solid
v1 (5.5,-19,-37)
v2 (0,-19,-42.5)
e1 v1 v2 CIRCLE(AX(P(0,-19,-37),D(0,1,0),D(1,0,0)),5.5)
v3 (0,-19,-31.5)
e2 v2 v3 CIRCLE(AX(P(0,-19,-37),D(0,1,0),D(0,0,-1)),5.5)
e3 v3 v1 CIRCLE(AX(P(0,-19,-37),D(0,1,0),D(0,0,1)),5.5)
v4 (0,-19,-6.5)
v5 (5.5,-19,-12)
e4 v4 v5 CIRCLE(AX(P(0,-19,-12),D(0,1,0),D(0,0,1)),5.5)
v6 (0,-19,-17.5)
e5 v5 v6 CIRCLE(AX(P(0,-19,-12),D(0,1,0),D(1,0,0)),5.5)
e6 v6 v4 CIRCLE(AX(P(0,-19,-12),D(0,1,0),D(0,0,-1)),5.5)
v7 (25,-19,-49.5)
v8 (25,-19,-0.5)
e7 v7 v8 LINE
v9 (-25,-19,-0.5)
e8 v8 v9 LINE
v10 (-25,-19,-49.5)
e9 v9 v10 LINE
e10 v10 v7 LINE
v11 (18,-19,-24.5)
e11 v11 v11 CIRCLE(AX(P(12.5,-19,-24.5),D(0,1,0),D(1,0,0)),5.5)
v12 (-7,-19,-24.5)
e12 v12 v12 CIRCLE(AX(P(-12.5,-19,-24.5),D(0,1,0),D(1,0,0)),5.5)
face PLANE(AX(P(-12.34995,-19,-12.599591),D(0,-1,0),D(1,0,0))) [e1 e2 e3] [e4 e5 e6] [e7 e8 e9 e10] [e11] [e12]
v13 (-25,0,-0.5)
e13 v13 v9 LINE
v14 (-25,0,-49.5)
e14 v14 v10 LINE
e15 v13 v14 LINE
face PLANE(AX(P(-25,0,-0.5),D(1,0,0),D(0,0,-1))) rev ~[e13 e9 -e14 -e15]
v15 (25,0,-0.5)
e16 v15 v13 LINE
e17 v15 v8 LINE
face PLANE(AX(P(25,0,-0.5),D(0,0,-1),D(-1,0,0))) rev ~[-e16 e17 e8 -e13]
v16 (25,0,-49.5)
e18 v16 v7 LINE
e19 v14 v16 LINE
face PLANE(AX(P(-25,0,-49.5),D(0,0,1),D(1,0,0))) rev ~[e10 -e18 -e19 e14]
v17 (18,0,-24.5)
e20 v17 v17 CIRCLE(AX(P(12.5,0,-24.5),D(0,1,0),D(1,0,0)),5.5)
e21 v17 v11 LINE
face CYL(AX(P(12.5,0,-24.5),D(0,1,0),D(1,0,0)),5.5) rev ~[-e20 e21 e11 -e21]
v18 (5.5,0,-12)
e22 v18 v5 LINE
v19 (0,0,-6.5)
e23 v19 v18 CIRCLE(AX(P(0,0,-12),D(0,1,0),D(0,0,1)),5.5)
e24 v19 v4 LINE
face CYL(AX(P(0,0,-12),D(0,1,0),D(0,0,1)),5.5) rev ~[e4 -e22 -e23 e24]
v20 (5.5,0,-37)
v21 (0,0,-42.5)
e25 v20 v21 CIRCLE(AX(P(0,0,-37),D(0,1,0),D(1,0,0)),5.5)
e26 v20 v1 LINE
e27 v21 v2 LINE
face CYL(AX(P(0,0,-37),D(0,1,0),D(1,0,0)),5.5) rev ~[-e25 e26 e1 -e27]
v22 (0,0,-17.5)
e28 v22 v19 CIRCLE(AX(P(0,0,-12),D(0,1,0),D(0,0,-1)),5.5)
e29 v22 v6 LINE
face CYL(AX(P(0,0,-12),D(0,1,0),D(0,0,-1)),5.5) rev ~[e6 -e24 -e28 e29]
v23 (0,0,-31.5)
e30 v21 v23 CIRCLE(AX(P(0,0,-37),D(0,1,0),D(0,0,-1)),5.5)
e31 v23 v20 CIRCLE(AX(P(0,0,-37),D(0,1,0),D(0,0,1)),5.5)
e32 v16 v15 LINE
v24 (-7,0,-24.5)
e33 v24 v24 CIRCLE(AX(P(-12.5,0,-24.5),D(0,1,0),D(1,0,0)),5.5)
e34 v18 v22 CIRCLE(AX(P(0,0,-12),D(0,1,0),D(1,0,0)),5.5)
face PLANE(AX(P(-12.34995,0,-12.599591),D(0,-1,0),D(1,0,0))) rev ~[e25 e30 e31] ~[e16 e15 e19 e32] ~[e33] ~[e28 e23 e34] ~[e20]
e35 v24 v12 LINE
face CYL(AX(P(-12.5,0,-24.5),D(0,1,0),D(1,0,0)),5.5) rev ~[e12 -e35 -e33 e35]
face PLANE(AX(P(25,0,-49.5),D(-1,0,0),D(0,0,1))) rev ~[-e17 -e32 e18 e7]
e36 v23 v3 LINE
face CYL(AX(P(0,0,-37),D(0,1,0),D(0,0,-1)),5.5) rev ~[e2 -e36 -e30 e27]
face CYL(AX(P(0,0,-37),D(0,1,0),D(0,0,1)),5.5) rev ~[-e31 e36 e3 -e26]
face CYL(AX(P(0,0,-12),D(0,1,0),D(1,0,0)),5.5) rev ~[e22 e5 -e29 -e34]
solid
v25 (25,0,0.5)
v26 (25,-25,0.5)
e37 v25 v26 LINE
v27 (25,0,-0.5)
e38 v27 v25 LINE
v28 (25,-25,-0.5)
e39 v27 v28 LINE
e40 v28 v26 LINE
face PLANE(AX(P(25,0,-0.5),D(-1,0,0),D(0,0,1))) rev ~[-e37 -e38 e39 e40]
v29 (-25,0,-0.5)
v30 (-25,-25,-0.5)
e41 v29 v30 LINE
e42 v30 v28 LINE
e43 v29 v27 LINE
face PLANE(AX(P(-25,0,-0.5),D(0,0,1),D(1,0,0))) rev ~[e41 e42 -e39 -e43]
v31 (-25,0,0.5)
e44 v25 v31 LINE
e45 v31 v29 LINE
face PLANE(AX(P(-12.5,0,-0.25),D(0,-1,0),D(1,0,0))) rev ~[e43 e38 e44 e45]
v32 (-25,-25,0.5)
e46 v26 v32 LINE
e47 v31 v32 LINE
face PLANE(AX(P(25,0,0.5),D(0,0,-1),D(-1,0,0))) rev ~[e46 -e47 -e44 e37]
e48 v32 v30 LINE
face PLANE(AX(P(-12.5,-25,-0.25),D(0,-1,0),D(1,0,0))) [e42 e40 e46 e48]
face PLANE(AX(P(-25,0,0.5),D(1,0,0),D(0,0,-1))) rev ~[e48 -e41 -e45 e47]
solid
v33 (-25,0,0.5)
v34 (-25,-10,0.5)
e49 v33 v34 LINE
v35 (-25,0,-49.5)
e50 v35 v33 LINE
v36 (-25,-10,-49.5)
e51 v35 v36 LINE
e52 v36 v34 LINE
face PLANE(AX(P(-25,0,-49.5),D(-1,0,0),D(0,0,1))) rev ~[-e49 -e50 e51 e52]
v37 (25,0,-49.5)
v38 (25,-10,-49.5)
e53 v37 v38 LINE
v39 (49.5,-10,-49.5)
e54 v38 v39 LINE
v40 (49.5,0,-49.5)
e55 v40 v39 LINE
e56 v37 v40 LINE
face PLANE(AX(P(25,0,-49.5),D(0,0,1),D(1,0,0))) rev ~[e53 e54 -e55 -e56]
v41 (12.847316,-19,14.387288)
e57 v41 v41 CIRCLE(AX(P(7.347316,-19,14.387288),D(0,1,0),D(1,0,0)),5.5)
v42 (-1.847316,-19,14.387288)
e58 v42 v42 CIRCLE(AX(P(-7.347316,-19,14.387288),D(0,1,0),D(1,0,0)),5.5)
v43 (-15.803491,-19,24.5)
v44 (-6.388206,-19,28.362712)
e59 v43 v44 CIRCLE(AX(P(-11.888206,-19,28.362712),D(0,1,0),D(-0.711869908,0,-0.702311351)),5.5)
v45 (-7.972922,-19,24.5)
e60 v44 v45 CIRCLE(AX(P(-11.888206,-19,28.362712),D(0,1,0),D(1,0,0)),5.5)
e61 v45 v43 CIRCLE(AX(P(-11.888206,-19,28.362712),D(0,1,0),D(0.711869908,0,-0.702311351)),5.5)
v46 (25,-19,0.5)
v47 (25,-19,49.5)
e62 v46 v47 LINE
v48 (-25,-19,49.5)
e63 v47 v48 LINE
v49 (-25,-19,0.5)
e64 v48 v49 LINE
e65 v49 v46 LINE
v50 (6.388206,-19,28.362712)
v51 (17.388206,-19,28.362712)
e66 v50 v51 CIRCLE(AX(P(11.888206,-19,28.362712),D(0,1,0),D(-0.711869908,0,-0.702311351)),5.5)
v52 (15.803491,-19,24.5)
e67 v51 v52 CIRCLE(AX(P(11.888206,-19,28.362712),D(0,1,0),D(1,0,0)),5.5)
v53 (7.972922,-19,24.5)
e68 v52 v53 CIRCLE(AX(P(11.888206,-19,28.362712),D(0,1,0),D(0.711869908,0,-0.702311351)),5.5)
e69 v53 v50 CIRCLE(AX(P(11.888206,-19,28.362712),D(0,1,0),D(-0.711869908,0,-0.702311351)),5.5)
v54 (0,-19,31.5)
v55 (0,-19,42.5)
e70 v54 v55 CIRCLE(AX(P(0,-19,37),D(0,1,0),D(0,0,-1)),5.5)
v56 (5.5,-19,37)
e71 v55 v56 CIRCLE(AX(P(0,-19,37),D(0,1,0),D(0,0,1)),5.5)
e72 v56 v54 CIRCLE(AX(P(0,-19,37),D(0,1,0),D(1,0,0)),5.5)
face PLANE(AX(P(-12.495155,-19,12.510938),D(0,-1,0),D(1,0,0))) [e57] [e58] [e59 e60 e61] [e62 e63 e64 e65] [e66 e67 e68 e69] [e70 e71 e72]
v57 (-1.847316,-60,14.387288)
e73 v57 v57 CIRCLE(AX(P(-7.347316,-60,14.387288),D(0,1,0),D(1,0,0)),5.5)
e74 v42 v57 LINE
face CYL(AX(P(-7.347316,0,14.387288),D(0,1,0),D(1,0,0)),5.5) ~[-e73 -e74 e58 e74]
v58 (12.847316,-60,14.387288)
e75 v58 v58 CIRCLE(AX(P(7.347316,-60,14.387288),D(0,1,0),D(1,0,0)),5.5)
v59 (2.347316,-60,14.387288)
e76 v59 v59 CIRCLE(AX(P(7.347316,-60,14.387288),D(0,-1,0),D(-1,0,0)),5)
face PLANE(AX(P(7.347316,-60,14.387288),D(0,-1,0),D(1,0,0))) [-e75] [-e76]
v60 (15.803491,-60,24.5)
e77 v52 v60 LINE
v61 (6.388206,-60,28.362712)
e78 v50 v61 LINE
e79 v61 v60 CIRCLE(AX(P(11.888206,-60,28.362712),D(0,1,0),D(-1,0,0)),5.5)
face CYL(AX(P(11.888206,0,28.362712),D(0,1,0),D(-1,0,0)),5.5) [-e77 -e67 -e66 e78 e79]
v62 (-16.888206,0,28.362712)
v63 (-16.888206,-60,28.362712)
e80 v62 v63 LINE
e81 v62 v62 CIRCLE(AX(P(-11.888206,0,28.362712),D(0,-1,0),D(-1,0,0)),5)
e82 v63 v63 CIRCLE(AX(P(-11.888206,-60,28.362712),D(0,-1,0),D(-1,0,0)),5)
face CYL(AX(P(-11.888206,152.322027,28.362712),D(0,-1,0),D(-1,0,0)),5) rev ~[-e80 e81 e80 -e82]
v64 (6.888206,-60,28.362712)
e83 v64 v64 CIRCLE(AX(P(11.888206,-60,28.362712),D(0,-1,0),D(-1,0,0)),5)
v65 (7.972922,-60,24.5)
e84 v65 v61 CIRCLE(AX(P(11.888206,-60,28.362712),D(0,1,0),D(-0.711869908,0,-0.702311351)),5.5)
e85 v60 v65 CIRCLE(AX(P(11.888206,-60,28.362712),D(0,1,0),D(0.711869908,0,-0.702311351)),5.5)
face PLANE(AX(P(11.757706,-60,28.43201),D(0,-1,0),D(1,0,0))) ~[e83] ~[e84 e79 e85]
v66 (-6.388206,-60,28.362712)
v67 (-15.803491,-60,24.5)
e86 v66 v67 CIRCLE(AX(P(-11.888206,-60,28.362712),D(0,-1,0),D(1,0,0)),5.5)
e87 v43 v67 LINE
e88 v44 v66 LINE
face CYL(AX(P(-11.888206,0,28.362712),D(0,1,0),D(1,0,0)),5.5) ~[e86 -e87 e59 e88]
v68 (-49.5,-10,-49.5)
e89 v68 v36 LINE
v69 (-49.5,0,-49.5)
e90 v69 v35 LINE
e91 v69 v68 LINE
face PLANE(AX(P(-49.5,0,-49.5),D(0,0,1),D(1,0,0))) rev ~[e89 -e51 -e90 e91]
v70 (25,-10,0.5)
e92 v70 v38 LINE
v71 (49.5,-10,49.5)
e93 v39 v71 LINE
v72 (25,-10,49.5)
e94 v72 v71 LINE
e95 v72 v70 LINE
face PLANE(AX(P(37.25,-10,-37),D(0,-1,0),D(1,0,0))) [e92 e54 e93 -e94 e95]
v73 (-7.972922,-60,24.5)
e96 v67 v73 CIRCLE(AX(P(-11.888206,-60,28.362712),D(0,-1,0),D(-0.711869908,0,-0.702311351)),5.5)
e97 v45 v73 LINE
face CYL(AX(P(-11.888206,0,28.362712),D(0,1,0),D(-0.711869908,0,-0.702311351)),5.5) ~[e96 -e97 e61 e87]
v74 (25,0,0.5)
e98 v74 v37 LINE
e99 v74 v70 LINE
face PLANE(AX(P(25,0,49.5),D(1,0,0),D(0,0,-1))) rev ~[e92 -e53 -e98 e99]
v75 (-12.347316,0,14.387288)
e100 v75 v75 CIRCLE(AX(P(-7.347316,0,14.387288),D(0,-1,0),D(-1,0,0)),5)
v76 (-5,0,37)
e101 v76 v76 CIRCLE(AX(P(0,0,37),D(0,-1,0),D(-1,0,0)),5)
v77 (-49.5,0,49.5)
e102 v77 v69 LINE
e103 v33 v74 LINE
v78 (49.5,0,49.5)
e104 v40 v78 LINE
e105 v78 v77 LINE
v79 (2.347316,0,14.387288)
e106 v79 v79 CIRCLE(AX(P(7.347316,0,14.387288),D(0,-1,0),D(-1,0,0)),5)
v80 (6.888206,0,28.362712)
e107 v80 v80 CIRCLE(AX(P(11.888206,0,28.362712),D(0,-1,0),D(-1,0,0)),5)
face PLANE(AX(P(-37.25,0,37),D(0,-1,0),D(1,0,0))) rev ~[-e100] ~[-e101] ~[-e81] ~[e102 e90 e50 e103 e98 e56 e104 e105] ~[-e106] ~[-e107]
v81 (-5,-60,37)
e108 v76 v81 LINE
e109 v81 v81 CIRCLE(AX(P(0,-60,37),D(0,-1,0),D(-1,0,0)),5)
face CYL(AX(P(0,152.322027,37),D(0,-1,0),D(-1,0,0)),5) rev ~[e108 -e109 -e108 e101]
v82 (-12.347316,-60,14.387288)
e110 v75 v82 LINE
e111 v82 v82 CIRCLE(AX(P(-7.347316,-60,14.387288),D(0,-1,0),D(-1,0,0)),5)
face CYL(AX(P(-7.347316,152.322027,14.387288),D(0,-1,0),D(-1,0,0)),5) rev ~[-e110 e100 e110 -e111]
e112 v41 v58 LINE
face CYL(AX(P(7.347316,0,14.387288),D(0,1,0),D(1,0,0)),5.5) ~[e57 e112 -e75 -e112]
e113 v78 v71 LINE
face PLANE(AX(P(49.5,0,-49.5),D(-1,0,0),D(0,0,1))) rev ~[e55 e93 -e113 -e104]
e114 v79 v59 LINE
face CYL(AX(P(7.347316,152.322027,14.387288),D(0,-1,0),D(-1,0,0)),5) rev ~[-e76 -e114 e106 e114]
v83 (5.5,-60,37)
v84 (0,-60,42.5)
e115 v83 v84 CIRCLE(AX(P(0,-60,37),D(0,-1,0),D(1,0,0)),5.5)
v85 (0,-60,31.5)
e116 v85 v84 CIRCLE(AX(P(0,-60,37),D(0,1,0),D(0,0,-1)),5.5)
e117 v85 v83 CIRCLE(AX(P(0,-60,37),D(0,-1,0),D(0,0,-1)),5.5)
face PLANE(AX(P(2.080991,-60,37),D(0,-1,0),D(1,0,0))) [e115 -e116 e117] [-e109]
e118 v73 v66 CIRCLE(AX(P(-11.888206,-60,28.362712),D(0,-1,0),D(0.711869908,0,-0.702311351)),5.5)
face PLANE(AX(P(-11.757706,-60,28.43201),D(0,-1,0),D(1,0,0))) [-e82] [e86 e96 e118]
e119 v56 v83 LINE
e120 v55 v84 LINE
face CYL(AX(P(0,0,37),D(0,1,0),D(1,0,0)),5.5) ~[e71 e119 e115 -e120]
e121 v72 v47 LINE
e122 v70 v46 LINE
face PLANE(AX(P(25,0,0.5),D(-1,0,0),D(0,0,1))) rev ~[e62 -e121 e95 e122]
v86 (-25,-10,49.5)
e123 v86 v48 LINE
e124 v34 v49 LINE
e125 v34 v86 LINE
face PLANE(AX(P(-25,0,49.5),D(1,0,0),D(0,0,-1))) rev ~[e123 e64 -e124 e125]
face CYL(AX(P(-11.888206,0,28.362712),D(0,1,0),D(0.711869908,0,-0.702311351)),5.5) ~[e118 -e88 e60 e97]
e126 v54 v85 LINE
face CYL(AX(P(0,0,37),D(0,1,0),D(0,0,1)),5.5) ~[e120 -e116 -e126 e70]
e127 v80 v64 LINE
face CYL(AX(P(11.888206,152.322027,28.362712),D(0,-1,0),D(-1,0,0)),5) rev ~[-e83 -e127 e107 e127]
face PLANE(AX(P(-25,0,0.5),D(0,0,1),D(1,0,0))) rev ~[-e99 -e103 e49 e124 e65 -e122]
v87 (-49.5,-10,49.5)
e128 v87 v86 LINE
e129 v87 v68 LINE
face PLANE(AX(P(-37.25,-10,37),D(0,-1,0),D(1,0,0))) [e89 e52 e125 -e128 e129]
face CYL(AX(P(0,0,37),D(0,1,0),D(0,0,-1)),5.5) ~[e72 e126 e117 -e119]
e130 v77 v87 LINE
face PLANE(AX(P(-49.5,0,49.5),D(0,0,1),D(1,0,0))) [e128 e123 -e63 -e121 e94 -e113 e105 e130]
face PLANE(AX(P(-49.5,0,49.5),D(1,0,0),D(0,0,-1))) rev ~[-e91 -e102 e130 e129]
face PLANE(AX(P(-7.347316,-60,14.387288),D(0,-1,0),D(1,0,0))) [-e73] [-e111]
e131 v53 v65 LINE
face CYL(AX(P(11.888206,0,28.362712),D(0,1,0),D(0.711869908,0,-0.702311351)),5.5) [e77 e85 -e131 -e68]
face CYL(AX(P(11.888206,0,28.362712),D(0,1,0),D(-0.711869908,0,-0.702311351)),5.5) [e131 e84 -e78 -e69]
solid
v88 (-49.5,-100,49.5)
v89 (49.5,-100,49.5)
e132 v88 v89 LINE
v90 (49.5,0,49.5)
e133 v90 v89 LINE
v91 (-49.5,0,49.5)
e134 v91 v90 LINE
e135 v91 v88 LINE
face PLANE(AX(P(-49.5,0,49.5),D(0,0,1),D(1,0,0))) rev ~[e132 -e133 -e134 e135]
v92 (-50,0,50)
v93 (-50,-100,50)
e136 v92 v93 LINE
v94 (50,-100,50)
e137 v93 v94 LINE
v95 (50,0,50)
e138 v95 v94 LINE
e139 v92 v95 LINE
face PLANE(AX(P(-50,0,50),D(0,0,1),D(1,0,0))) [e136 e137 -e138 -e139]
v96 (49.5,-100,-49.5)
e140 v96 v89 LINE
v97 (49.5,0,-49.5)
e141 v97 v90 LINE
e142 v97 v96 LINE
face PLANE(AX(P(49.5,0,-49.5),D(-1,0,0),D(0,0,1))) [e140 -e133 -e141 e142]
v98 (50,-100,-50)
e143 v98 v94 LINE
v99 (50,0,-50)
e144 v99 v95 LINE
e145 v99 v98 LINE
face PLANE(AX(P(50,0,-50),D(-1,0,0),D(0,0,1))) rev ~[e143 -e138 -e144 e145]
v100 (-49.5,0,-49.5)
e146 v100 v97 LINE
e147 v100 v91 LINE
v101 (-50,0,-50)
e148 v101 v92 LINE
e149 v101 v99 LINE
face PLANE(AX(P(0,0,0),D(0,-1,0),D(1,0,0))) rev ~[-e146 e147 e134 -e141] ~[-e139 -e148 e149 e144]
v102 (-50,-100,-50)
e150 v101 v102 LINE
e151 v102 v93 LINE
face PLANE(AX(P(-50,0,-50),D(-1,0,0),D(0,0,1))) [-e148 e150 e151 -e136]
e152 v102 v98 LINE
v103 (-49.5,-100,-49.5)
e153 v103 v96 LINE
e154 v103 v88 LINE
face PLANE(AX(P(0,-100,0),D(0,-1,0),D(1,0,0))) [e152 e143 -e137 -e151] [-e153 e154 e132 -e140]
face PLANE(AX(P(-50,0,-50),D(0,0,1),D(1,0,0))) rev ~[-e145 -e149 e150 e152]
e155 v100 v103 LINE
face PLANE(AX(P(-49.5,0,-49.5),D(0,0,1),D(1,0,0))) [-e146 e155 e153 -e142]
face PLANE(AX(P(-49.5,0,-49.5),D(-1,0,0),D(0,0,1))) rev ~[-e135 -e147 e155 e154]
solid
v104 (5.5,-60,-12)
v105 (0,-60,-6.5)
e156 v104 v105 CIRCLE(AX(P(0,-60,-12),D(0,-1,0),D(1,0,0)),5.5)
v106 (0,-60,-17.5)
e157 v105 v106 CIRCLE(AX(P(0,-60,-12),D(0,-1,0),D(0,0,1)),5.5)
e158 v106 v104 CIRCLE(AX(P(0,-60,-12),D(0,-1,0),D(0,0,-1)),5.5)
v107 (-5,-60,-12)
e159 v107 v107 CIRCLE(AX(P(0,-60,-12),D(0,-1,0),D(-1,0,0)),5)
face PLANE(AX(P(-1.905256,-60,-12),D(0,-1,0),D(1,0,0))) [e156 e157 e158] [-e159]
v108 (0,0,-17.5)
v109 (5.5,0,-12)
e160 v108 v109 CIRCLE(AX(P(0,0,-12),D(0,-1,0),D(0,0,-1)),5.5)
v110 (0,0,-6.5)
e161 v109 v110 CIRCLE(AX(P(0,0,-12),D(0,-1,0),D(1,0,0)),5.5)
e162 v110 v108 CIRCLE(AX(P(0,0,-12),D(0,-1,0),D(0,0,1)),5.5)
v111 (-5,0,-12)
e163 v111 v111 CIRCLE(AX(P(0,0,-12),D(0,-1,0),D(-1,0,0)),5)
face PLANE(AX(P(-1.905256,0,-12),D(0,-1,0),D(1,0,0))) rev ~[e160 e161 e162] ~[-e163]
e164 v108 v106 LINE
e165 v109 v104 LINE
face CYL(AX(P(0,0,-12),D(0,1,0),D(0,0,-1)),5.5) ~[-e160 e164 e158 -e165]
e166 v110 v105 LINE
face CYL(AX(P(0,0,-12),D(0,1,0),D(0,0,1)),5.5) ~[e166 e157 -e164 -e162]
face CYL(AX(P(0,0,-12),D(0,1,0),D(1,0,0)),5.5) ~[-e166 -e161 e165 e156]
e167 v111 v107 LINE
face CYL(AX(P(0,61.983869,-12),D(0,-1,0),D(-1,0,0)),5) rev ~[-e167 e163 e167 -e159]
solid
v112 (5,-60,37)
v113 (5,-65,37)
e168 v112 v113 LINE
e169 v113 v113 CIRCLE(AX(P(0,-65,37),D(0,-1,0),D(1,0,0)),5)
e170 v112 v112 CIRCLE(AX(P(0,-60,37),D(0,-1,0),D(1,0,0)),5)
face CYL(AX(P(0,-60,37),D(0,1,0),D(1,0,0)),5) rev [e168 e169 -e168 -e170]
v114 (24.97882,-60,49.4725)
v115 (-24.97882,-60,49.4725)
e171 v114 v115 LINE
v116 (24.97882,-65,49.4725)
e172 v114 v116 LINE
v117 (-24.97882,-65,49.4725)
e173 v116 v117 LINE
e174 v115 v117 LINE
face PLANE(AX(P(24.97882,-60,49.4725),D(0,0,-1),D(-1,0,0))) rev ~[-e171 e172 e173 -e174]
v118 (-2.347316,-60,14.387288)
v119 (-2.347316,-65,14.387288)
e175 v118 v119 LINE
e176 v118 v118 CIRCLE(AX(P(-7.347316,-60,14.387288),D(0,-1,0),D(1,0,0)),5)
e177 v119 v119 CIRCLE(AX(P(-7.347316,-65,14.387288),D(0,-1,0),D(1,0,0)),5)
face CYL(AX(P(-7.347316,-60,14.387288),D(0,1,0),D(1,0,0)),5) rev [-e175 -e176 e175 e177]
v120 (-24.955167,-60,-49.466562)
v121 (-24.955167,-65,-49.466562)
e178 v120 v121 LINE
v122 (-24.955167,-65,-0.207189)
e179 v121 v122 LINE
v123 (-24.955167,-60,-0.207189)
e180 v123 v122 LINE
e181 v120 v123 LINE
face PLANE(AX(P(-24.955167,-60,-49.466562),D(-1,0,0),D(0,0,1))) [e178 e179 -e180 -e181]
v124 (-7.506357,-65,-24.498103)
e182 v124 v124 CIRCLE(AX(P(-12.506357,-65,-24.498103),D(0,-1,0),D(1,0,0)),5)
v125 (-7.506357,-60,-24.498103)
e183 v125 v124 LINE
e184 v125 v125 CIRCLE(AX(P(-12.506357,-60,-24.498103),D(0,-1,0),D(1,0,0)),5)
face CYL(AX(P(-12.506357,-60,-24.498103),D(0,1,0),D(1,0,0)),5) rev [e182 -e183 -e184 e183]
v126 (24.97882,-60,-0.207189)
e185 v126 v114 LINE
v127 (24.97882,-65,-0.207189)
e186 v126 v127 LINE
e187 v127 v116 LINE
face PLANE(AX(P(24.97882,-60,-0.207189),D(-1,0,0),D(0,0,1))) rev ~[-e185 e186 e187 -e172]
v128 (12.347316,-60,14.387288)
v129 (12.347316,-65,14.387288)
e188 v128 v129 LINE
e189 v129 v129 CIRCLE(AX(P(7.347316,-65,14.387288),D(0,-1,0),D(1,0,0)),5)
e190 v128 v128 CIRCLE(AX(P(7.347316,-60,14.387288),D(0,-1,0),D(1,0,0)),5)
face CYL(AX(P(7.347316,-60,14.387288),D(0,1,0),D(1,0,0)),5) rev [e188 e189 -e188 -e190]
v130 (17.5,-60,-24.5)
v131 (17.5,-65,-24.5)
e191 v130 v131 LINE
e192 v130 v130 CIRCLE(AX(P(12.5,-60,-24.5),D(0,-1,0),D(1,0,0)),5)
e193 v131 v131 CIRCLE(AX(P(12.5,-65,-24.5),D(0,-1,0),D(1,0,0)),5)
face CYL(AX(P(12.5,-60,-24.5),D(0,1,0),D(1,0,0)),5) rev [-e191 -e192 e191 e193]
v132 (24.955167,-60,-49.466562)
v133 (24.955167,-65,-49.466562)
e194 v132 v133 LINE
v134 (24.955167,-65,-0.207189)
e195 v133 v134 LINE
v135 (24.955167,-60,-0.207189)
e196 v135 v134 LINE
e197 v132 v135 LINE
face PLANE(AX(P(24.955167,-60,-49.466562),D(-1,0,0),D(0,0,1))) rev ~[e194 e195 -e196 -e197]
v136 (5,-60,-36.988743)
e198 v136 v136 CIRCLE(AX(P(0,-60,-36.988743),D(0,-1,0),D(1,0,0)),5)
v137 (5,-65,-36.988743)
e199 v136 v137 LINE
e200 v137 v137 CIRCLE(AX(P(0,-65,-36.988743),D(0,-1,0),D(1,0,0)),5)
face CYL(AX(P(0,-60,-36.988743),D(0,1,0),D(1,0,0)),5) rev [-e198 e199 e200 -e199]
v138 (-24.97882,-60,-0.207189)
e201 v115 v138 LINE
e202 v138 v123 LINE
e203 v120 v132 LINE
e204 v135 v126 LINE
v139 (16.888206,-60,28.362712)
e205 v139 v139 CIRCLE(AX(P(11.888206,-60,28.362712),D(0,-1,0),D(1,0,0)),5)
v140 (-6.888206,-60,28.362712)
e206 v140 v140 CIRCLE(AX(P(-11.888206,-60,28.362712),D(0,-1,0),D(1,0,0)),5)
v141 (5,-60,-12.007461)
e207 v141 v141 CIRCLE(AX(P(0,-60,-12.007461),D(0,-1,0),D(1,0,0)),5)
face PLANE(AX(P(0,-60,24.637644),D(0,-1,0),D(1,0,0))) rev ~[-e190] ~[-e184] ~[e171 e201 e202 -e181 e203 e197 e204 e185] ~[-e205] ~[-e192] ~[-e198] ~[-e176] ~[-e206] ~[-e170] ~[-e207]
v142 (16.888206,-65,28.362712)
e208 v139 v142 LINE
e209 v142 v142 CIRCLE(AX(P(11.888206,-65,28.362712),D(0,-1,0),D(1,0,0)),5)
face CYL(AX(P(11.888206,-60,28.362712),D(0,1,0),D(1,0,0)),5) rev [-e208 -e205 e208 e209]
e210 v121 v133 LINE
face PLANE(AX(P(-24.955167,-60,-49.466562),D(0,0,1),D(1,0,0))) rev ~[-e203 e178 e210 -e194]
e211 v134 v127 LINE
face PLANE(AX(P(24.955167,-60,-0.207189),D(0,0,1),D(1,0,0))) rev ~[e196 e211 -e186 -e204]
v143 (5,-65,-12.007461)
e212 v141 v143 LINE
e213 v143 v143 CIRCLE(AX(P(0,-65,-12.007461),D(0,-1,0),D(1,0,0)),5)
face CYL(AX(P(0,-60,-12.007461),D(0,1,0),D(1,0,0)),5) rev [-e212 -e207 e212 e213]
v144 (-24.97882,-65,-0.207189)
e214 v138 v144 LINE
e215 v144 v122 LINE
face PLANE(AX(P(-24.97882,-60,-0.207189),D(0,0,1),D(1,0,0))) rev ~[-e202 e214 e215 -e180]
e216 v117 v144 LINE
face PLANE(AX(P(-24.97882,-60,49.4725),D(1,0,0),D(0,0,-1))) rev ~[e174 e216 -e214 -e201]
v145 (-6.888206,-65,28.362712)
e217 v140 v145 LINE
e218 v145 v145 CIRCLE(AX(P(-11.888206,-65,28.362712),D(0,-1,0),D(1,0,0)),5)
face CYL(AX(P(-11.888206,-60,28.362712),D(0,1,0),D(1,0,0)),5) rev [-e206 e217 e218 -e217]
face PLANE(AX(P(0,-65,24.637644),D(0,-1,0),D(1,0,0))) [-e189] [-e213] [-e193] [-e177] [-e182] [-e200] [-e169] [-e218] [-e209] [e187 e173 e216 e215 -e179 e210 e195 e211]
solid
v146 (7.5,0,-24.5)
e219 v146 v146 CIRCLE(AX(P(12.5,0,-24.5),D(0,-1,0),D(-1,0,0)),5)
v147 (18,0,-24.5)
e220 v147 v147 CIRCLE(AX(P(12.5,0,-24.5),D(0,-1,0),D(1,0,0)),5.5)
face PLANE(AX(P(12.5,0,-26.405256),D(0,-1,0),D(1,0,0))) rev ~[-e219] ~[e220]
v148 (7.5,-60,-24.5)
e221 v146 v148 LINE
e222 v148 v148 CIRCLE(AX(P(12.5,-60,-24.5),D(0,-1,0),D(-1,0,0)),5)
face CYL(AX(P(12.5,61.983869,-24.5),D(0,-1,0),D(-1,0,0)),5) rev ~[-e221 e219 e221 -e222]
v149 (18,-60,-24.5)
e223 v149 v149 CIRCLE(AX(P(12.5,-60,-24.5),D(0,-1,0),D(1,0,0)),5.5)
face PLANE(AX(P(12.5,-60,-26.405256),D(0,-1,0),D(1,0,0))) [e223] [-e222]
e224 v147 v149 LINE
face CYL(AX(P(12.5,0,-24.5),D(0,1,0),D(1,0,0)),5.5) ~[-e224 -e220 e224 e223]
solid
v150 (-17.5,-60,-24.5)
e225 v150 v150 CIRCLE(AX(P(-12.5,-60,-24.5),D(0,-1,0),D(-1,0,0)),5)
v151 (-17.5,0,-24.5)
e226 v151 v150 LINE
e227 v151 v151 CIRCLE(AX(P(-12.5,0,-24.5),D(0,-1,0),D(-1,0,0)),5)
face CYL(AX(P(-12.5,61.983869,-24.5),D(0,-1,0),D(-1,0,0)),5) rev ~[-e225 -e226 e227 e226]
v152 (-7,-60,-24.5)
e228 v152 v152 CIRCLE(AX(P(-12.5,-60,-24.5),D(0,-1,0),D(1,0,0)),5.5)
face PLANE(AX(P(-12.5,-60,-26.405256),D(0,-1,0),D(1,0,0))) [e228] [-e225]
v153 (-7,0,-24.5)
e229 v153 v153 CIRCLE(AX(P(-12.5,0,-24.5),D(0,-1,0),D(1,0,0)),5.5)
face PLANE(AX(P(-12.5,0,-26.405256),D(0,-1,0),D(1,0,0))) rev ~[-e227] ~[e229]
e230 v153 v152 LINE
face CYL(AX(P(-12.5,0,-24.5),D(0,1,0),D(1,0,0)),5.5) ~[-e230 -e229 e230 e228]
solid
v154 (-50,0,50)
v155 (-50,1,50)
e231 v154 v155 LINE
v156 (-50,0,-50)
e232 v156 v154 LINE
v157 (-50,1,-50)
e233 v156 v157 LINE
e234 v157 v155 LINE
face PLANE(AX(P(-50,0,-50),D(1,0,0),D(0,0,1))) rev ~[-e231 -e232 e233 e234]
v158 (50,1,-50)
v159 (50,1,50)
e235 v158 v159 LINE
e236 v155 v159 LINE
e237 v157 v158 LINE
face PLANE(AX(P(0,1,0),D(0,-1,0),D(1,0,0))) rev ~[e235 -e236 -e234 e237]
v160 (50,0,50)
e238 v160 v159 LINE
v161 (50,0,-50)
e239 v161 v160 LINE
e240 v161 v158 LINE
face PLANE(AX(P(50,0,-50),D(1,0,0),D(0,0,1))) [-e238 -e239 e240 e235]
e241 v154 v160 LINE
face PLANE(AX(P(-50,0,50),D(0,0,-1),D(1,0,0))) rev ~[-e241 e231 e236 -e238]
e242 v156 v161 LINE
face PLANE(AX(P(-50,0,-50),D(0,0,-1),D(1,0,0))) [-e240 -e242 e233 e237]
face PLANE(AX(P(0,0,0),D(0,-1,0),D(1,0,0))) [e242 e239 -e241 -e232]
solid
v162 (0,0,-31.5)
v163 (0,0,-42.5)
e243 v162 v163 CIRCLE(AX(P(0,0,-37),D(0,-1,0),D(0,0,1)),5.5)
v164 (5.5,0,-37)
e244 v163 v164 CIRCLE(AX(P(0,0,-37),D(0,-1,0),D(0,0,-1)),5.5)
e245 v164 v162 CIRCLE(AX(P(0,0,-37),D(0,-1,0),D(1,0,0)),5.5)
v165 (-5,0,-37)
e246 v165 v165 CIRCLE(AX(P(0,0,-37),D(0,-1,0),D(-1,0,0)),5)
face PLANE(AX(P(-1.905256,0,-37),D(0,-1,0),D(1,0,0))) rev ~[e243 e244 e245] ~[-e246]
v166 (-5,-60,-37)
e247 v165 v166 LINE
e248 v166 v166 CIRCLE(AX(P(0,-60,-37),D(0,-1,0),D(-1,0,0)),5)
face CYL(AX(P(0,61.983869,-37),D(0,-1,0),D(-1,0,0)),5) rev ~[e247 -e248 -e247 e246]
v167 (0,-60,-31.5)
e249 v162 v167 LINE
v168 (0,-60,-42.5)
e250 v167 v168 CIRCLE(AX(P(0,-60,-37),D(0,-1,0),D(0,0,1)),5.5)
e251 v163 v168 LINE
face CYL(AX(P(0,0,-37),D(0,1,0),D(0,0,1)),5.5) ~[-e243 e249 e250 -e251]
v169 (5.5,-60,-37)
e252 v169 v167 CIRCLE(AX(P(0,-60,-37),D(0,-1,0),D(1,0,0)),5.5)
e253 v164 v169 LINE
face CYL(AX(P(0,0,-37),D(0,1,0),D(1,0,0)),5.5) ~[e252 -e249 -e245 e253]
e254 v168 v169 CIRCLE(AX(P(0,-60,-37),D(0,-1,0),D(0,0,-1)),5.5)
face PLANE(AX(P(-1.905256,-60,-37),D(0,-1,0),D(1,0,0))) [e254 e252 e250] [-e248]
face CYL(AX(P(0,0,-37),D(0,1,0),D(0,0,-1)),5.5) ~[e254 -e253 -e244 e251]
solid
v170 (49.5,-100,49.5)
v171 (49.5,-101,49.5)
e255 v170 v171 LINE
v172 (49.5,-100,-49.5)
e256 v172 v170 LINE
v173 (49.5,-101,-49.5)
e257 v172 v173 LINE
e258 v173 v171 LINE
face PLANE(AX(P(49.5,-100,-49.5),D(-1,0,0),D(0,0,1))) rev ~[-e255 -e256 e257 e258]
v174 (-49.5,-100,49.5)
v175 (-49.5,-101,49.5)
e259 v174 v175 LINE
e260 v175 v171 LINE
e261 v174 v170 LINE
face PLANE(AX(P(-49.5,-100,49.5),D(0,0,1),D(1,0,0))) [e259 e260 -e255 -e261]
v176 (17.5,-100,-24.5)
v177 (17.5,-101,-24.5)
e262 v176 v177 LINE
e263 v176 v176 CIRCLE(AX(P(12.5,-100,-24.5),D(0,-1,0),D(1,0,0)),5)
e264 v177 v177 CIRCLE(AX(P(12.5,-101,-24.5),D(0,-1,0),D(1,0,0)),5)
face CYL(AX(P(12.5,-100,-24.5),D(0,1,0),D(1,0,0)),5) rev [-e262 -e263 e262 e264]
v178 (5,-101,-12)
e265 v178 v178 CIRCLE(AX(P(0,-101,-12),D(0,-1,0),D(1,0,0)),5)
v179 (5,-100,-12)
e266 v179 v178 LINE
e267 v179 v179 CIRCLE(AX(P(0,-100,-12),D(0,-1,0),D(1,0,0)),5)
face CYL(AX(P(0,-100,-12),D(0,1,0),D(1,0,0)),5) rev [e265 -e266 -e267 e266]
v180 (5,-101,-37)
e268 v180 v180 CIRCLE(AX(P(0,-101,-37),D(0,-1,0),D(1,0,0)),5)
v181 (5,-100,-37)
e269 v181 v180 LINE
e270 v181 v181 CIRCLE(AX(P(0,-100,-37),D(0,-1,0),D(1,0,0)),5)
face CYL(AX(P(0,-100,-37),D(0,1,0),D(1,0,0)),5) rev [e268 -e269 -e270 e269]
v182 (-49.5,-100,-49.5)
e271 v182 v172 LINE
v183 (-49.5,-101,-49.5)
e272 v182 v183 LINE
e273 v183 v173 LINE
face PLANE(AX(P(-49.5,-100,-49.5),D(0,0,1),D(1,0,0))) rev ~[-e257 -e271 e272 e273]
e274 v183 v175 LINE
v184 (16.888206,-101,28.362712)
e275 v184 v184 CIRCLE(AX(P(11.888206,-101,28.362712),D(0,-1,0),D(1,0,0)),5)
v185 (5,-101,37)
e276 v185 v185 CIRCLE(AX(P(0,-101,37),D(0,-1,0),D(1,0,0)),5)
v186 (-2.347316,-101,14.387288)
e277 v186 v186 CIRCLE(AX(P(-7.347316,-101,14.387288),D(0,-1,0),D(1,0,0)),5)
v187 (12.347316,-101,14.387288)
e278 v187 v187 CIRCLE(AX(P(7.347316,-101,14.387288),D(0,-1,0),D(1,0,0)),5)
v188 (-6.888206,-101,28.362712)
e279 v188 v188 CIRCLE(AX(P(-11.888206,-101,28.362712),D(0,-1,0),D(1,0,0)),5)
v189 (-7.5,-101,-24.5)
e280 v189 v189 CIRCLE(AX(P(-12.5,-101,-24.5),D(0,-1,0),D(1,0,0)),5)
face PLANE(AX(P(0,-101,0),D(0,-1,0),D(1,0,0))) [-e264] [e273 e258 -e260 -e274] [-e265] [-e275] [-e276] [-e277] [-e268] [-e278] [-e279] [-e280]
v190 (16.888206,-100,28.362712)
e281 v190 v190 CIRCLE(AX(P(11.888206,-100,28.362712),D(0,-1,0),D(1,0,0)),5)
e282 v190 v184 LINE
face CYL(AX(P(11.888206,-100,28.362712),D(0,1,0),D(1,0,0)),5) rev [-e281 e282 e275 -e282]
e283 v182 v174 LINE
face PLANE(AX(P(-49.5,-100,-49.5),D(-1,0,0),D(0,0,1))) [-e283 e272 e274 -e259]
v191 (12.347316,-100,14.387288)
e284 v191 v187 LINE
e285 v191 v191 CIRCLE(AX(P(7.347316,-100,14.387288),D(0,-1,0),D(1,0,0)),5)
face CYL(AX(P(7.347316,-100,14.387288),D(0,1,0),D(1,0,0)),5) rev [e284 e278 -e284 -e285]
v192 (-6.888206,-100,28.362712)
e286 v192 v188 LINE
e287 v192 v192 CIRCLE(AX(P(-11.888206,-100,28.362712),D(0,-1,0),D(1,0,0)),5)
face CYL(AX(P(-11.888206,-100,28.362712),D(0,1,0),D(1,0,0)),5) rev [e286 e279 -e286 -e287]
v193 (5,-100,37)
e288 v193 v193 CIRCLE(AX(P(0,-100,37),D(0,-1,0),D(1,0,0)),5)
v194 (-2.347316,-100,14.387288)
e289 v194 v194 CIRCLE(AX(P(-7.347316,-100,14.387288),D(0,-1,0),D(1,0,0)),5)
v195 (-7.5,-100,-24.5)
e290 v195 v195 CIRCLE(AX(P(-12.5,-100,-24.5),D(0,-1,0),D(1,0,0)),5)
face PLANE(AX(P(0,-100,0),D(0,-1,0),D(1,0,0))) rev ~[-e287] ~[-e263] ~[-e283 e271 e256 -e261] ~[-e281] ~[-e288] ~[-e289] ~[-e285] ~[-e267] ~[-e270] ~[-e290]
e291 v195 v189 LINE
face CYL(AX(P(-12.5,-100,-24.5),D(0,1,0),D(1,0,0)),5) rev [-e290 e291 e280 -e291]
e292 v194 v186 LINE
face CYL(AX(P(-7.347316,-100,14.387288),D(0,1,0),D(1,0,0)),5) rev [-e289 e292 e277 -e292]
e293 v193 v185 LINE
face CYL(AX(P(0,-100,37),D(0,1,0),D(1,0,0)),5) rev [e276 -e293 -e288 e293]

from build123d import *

# Parameters (mm, degrees)
F0_R      = 5.5
F1_DEPTH  = 19
F0_W      = 24.5
F0_H      = 25
F2_DEPTH  = 10
F3_DEPTH  = 60
F0_W_2    = 25
F0_H_2    = 0.5
F4_DEPTH  = 25
F5_D      = 10
F5_2_D    = 10
F5_3_D    = 10
F5_4_D    = 10
F5_5_D    = 10
F6_W      = 100
F6_H      = 100
F6_W_2    = 99
F6_H_2    = 99
F7_DEPTH  = 100
F8_W      = 99
F8_H      = 99
F8_R      = 5
F9_DEPTH  = 1
F10_W     = 100
F10_H     = 100
F11_DEPTH = 1
F13_R     = 5
F13_W     = 49.9103330076
F13_H     = 49.2593720555
F13_H_2   = 0.8928030729
F14_DEPTH = 5


# Not quite as in the source:
# - a pattern or mirror of a feature is missing from the dataset's text; its kind, count and spacing are read off the source's solid
# - a feature names something its author has since deleted; it is built from what else it names


with BuildPart() as f1:
    # F0 (on Front) → F1 (new body)
    with BuildSketch(Plane.XZ):
        with BuildLine():
            Line((-15.8034909498, 24.5), (-25, 24.5))
            Line((-25, 24.5), (-25, 0.5))
            Line((-25, 0.5), (0, 0.5))
            Line((0, 0.5), (0, 24.5))
            Line((0, 24.5), (-7.9729219576, 24.5))
            ThreePointArc((-7.9729219576, 24.5), (-11.8882064537, 22.8627124297), (-15.8034909498, 24.5))
        make_face()
        with Locations((-7.3473156537, 14.3872875703)):
            Circle(F0_R, mode=Mode.SUBTRACT)
        with BuildLine():
            Line((0, 49.5), (-25, 49.5))
            Line((-25, 49.5), (-25, 24.5))
            Line((-25, 24.5), (-15.8034909498, 24.5))
            ThreePointArc((-15.8034909498, 24.5), (-13.9757810358, 33.4511338317), (-6.3882064537, 28.3627124297))
            ThreePointArc((-6.3882064537, 28.3627124297), (-6.7997850517, 26.2751378476), (-7.9729219576, 24.5))
            Line((-7.9729219576, 24.5), (0, 24.5))
            Line((0, 24.5), (0, 31.5))
            ThreePointArc((0, 31.5), (-5.5, 37), (0, 42.5))
            Line((0, 42.5), (0, 49.5))
        make_face()
        with BuildLine():
            Line((25, 49.5), (0, 49.5))
            Line((0, 49.5), (0, 42.5))
            ThreePointArc((0, 42.5), (3.8890872965, 40.8890872965), (5.5, 37))
            ThreePointArc((5.5, 37), (3.8890872965, 33.1109127035), (0, 31.5))
            Line((0, 31.5), (0, 24.5))
            Line((0, 24.5), (7.9729219576, 24.5))
            ThreePointArc((7.9729219576, 24.5), (9.8006318716, 33.4511338317), (17.3882064537, 28.3627124297))
            ThreePointArc((17.3882064537, 28.3627124297), (16.9766278557, 26.2751378476), (15.8034909498, 24.5))
            Line((15.8034909498, 24.5), (25, 24.5))
            Line((25, 24.5), (25, 49.5))
        make_face()
        with BuildLine():
            Line((25, 0.5), (25, 24.5))
            Line((25, 24.5), (15.8034909498, 24.5))
            ThreePointArc((15.8034909498, 24.5), (11.8882064537, 22.8627124297), (7.9729219576, 24.5))
            Line((7.9729219576, 24.5), (0, 24.5))
            Line((0, 24.5), (0, 0.5))
            Line((0, 0.5), (25, 0.5))
        make_face()
        with Locations((7.3473156537, 14.3872875703)):
            Circle(F0_R, mode=Mode.SUBTRACT)
    extrude(amount=F1_DEPTH)

    # F0 (on Front) → F2 (join)
    with BuildSketch(Plane.XZ):
        with Locations((-37.25, 37)):
            Rectangle(F0_W, F0_H)
        Polygon((-25, 24.5), (-49.5, 24.5), (-49.5, 0), (-25, 0), (-25, 0.5), align=None)
        Polygon((-25, 0), (-49.5, 0), (-49.5, -24.5), (-25, -24.5), (-25, -0.5), align=None)
        with Locations((-37.25, -37)):
            Rectangle(F0_W, F0_H)
        with Locations((37.25, -37)):
            Rectangle(F0_W, F0_H)
        Polygon((49.5, 0), (25, 0), (25, -0.5), (25, -24.5), (49.5, -24.5), align=None)
        Polygon((49.5, 24.5), (25, 24.5), (25, 0.5), (25, 0), (49.5, 0), align=None)
        with Locations((37.25, 37)):
            Rectangle(F0_W, F0_H)
    extrude(amount=F2_DEPTH)

    # F0 (on Front) → F3 (join)
    with BuildSketch(Plane.XZ):
        with BuildLine():
            ThreePointArc((-6.3882064537, 28.3627124297), (-13.9757810358, 33.4511338317), (-15.8034909498, 24.5))
            Line((-15.8034909498, 24.5), (-7.9729219576, 24.5))
            ThreePointArc((-7.9729219576, 24.5), (-6.7997850517, 26.2751378476), (-6.3882064537, 28.3627124297))
        make_face()
        with BuildLine():
            Line((-7.9729219576, 24.5), (-15.8034909498, 24.5))
            ThreePointArc((-15.8034909498, 24.5), (-11.8882064537, 22.8627124297), (-7.9729219576, 24.5))
        make_face()
        with BuildLine():
            ThreePointArc((5.5, 37), (3.8890872965, 40.8890872965), (0, 42.5))
            Line((0, 42.5), (0, 31.5))
            ThreePointArc((0, 31.5), (3.8890872965, 33.1109127035), (5.5, 37))
        make_face()
        with BuildLine():
            Line((0, 31.5), (0, 42.5))
            ThreePointArc((0, 42.5), (-5.5, 37), (0, 31.5))
        make_face()
        with Locations((7.3473156537, 14.3872875703)):
            Circle(F0_R)
        with Locations((-7.3473156537, 14.3872875703)):
            Circle(F0_R)
    f3_solid = extrude(amount=F3_DEPTH)

    # F3_copies: F3 across plane
    add(f3_solid.mirror(Plane(origin=(0, 0, 0), x_dir=(0, 0, 1), z_dir=(1, 0, 0))))

    # F5 (through all)
    with Locations(Plane(origin=(0, 0, 0), x_dir=(1, 0, 0), z_dir=(0, 1, 0))):
        with Locations((-11.8882064537, -28.3627124297), (0, -37), (11.8882064537, -28.3627124297), (7.3473156537, -14.3872875703), (-7.3473156537, -14.3872875703), (0, 12), (-12.5, 24.5), (0, 37), (12.5, 24.5)):
            Hole(F5_D / 2)


with BuildPart() as f1b:
    # F0 (on Front) → F1, piece 2 (new body)
    with BuildSketch(Plane.XZ):
        with BuildLine():
            Line((-25, -0.5), (-25, -24.5))
            Line((-25, -24.5), (-18, -24.5))
            ThreePointArc((-18, -24.5), (-12.5, -19), (-7, -24.5))
            Line((-7, -24.5), (0, -24.5))
            Line((0, -24.5), (0, -17.5))
            ThreePointArc((0, -17.5), (-5.5, -12), (0, -6.5))
            Line((0, -6.5), (0, -0.5))
            Line((0, -0.5), (-25, -0.5))
        make_face()
        with BuildLine():
            Line((25, -0.5), (0, -0.5))
            Line((0, -0.5), (0, -6.5))
            ThreePointArc((0, -6.5), (3.8890872965, -8.1109127035), (5.5, -12))
            ThreePointArc((5.5, -12), (3.8890872965, -15.8890872965), (0, -17.5))
            Line((0, -17.5), (0, -24.5))
            Line((0, -24.5), (7, -24.5))
            ThreePointArc((7, -24.5), (12.5, -19), (18, -24.5))
            Line((18, -24.5), (25, -24.5))
            Line((25, -24.5), (25, -0.5))
        make_face()
        with BuildLine():
            Line((0, -42.5), (0, -49.5))
            Line((0, -49.5), (25, -49.5))
            Line((25, -49.5), (25, -24.5))
            Line((25, -24.5), (18, -24.5))
            ThreePointArc((18, -24.5), (12.5, -30), (7, -24.5))
            Line((7, -24.5), (0, -24.5))
            Line((0, -24.5), (0, -31.5))
            ThreePointArc((0, -31.5), (3.8890872965, -33.1109127035), (5.5, -37))
            ThreePointArc((5.5, -37), (3.8890872965, -40.8890872965), (0, -42.5))
        make_face()
        with BuildLine():
            Line((-18, -24.5), (-25, -24.5))
            Line((-25, -24.5), (-25, -49.5))
            Line((-25, -49.5), (0, -49.5))
            Line((0, -49.5), (0, -42.5))
            ThreePointArc((0, -42.5), (-5.5, -37), (0, -31.5))
            Line((0, -31.5), (0, -24.5))
            Line((0, -24.5), (-7, -24.5))
            ThreePointArc((-7, -24.5), (-12.5, -30), (-18, -24.5))
        make_face()
    extrude(amount=F1_DEPTH)


with BuildPart() as f3:
    # F0 (on Front) → F3, piece 2 (new body)
    with BuildSketch(Plane.XZ):
        with BuildLine():
            Line((0, -17.5), (0, -6.5))
            ThreePointArc((0, -6.5), (-5.5, -12), (0, -17.5))
        make_face()
        with BuildLine():
            ThreePointArc((5.5, -12), (3.8890872965, -8.1109127035), (0, -6.5))
            Line((0, -6.5), (0, -17.5))
            ThreePointArc((0, -17.5), (3.8890872965, -15.8890872965), (5.5, -12))
        make_face()
    extrude(amount=F3_DEPTH)

    # F5#2 (through all)
    with Locations(Plane(origin=(0, 0, 0), x_dir=(1, 0, 0), z_dir=(0, 1, 0))):
        with Locations((-11.8882064537, -28.3627124297), (0, -37), (11.8882064537, -28.3627124297), (7.3473156537, -14.3872875703), (-7.3473156537, -14.3872875703), (0, 12), (-12.5, 24.5), (0, 37), (12.5, 24.5)):
            Hole(F5_2_D / 2)


with BuildPart() as f3b:
    # F0 (on Front) → F3, piece 3 (new body)
    with BuildSketch(Plane.XZ):
        with BuildLine():
            Line((-7, -24.5), (-18, -24.5))
            ThreePointArc((-18, -24.5), (-12.5, -30), (-7, -24.5))
        make_face()
        with BuildLine():
            ThreePointArc((-7, -24.5), (-12.5, -19), (-18, -24.5))
            Line((-18, -24.5), (-7, -24.5))
        make_face()
    extrude(amount=F3_DEPTH)

    # F5#3 (through all)
    with Locations(Plane(origin=(0, 0, 0), x_dir=(1, 0, 0), z_dir=(0, 1, 0))):
        with Locations((-11.8882064537, -28.3627124297), (0, -37), (11.8882064537, -28.3627124297), (7.3473156537, -14.3872875703), (-7.3473156537, -14.3872875703), (0, 12), (-12.5, 24.5), (0, 37), (12.5, 24.5)):
            Hole(F5_3_D / 2)


with BuildPart() as f3c:
    # F0 (on Front) → F3, piece 4 (new body)
    with BuildSketch(Plane.XZ):
        with BuildLine():
            Line((18, -24.5), (7, -24.5))
            ThreePointArc((7, -24.5), (12.5, -30), (18, -24.5))
        make_face()
        with BuildLine():
            ThreePointArc((18, -24.5), (12.5, -19), (7, -24.5))
            Line((7, -24.5), (18, -24.5))
        make_face()
    extrude(amount=F3_DEPTH)

    # F5#4 (through all)
    with Locations(Plane(origin=(0, 0, 0), x_dir=(1, 0, 0), z_dir=(0, 1, 0))):
        with Locations((-11.8882064537, -28.3627124297), (0, -37), (11.8882064537, -28.3627124297), (7.3473156537, -14.3872875703), (-7.3473156537, -14.3872875703), (0, 12), (-12.5, 24.5), (0, 37), (12.5, 24.5)):
            Hole(F5_4_D / 2)


with BuildPart() as f3d:
    # F0 (on Front) → F3, piece 5 (new body)
    with BuildSketch(Plane.XZ):
        with BuildLine():
            ThreePointArc((0, -31.5), (-5.5, -37), (0, -42.5))
            Line((0, -42.5), (0, -31.5))
        make_face()
        with BuildLine():
            Line((0, -31.5), (0, -42.5))
            ThreePointArc((0, -42.5), (3.8890872965, -40.8890872965), (5.5, -37))
            ThreePointArc((5.5, -37), (3.8890872965, -33.1109127035), (0, -31.5))
        make_face()
    extrude(amount=F3_DEPTH)

    # F5#5 (through all)
    with Locations(Plane(origin=(0, 0, 0), x_dir=(1, 0, 0), z_dir=(0, 1, 0))):
        with Locations((-11.8882064537, -28.3627124297), (0, -37), (11.8882064537, -28.3627124297), (7.3473156537, -14.3872875703), (-7.3473156537, -14.3872875703), (0, 12), (-12.5, 24.5), (0, 37), (12.5, 24.5)):
            Hole(F5_5_D / 2)


with BuildPart() as f4:
    # F0 (on Front) → F4 (new body)
    with BuildSketch(Plane.XZ):
        with Locations((-12.5, -0.25)):
            Rectangle(F0_W_2, F0_H_2)
        with Locations((-12.5, 0.25)):
            Rectangle(F0_W_2, F0_H_2)
        with Locations((12.5, 0.25)):
            Rectangle(F0_W_2, F0_H_2)
        with Locations((12.5, -0.25)):
            Rectangle(F0_W_2, F0_H_2)
    extrude(amount=F4_DEPTH)


with BuildPart() as f7:
    # F6 (on Front) → F7 (new body)
    with BuildSketch(Plane.XZ):
        Rectangle(F6_W, F6_H)
        Rectangle(F6_W_2, F6_H_2, mode=Mode.SUBTRACT)
    extrude(amount=F7_DEPTH)


with BuildPart() as f9:
    # F8 (on face) → F9 (new body)
    with BuildSketch(Plane.XZ.offset(100)):
        Rectangle(F8_W, F8_H)
        with Locations((-12.5, -24.5)):
            Circle(F8_R, mode=Mode.SUBTRACT)
        with Locations((0, -37)):
            Circle(F8_R, mode=Mode.SUBTRACT)
        with Locations((12.5, -24.5)):
            Circle(F8_R, mode=Mode.SUBTRACT)
        with Locations((0, -12)):
            Circle(F8_R, mode=Mode.SUBTRACT)
        with Locations((-7.3473156537, 14.3872875703)):
            Circle(F8_R, mode=Mode.SUBTRACT)
        with Locations((-11.8882064537, 28.3627124297)):
            Circle(F8_R, mode=Mode.SUBTRACT)
        with Locations((7.3473156537, 14.3872875703)):
            Circle(F8_R, mode=Mode.SUBTRACT)
        with Locations((11.8882064537, 28.3627124297)):
            Circle(F8_R, mode=Mode.SUBTRACT)
        with Locations((0, 37)):
            Circle(F8_R, mode=Mode.SUBTRACT)
    extrude(amount=F9_DEPTH)


with BuildPart() as f11:
    # F10 (on Front) → F11 (new body)
    with BuildSketch(Plane.XZ):
        Rectangle(F10_W, F10_H)
    extrude(amount=-F11_DEPTH)


with BuildPart() as f14:
    # F13 (on offset) → F14 (new body)
    with BuildSketch(Plane.XZ.offset(60)):
        Polygon((24.9788202345, -0.2071894705), (24.9788202345, 49.4724996388), (-24.9788202345, 49.4724996388), (-24.9788202345, -0.2071894705), (-24.9551665038, -0.2071894705), (-24.9551665038, 0.6856136024), (24.9551665038, 0.6856136024), (24.9551665038, -0.2071894705), align=None)
        with Locations((-7.3473156537, 14.3872875703)):
            Circle(F13_R, mode=Mode.SUBTRACT)
        with Locations((-11.8882064537, 28.3627124297)):
            Circle(F13_R, mode=Mode.SUBTRACT)
        with Locations((7.3473156537, 14.3872875703)):
            Circle(F13_R, mode=Mode.SUBTRACT)
        with Locations((0, 37)):
            Circle(F13_R, mode=Mode.SUBTRACT)
        with Locations((11.8882064537, 28.3627124297)):
            Circle(F13_R, mode=Mode.SUBTRACT)
        with Locations((0, -24.8368754983)):
            Rectangle(F13_W, F13_H)
        with Locations((-12.5063573942, -24.4981031865)):
            Circle(F13_R, mode=Mode.SUBTRACT)
        with Locations((0, -36.9887426496)):
            Circle(F13_R, mode=Mode.SUBTRACT)
        with Locations((0, -12.0074609295)):
            Circle(F13_R, mode=Mode.SUBTRACT)
        with Locations((12.5, -24.5)):
            Circle(F13_R, mode=Mode.SUBTRACT)
        with Locations((0, 0.2392120659)):
            Rectangle(F13_W, F13_H_2)
    extrude(amount=F14_DEPTH)


solid = Compound([f1.part, f1b.part, f3.part, f3b.part, f3c.part, f3d.part, f4.part, f7.part, f9.part, f11.part, f14.part])
